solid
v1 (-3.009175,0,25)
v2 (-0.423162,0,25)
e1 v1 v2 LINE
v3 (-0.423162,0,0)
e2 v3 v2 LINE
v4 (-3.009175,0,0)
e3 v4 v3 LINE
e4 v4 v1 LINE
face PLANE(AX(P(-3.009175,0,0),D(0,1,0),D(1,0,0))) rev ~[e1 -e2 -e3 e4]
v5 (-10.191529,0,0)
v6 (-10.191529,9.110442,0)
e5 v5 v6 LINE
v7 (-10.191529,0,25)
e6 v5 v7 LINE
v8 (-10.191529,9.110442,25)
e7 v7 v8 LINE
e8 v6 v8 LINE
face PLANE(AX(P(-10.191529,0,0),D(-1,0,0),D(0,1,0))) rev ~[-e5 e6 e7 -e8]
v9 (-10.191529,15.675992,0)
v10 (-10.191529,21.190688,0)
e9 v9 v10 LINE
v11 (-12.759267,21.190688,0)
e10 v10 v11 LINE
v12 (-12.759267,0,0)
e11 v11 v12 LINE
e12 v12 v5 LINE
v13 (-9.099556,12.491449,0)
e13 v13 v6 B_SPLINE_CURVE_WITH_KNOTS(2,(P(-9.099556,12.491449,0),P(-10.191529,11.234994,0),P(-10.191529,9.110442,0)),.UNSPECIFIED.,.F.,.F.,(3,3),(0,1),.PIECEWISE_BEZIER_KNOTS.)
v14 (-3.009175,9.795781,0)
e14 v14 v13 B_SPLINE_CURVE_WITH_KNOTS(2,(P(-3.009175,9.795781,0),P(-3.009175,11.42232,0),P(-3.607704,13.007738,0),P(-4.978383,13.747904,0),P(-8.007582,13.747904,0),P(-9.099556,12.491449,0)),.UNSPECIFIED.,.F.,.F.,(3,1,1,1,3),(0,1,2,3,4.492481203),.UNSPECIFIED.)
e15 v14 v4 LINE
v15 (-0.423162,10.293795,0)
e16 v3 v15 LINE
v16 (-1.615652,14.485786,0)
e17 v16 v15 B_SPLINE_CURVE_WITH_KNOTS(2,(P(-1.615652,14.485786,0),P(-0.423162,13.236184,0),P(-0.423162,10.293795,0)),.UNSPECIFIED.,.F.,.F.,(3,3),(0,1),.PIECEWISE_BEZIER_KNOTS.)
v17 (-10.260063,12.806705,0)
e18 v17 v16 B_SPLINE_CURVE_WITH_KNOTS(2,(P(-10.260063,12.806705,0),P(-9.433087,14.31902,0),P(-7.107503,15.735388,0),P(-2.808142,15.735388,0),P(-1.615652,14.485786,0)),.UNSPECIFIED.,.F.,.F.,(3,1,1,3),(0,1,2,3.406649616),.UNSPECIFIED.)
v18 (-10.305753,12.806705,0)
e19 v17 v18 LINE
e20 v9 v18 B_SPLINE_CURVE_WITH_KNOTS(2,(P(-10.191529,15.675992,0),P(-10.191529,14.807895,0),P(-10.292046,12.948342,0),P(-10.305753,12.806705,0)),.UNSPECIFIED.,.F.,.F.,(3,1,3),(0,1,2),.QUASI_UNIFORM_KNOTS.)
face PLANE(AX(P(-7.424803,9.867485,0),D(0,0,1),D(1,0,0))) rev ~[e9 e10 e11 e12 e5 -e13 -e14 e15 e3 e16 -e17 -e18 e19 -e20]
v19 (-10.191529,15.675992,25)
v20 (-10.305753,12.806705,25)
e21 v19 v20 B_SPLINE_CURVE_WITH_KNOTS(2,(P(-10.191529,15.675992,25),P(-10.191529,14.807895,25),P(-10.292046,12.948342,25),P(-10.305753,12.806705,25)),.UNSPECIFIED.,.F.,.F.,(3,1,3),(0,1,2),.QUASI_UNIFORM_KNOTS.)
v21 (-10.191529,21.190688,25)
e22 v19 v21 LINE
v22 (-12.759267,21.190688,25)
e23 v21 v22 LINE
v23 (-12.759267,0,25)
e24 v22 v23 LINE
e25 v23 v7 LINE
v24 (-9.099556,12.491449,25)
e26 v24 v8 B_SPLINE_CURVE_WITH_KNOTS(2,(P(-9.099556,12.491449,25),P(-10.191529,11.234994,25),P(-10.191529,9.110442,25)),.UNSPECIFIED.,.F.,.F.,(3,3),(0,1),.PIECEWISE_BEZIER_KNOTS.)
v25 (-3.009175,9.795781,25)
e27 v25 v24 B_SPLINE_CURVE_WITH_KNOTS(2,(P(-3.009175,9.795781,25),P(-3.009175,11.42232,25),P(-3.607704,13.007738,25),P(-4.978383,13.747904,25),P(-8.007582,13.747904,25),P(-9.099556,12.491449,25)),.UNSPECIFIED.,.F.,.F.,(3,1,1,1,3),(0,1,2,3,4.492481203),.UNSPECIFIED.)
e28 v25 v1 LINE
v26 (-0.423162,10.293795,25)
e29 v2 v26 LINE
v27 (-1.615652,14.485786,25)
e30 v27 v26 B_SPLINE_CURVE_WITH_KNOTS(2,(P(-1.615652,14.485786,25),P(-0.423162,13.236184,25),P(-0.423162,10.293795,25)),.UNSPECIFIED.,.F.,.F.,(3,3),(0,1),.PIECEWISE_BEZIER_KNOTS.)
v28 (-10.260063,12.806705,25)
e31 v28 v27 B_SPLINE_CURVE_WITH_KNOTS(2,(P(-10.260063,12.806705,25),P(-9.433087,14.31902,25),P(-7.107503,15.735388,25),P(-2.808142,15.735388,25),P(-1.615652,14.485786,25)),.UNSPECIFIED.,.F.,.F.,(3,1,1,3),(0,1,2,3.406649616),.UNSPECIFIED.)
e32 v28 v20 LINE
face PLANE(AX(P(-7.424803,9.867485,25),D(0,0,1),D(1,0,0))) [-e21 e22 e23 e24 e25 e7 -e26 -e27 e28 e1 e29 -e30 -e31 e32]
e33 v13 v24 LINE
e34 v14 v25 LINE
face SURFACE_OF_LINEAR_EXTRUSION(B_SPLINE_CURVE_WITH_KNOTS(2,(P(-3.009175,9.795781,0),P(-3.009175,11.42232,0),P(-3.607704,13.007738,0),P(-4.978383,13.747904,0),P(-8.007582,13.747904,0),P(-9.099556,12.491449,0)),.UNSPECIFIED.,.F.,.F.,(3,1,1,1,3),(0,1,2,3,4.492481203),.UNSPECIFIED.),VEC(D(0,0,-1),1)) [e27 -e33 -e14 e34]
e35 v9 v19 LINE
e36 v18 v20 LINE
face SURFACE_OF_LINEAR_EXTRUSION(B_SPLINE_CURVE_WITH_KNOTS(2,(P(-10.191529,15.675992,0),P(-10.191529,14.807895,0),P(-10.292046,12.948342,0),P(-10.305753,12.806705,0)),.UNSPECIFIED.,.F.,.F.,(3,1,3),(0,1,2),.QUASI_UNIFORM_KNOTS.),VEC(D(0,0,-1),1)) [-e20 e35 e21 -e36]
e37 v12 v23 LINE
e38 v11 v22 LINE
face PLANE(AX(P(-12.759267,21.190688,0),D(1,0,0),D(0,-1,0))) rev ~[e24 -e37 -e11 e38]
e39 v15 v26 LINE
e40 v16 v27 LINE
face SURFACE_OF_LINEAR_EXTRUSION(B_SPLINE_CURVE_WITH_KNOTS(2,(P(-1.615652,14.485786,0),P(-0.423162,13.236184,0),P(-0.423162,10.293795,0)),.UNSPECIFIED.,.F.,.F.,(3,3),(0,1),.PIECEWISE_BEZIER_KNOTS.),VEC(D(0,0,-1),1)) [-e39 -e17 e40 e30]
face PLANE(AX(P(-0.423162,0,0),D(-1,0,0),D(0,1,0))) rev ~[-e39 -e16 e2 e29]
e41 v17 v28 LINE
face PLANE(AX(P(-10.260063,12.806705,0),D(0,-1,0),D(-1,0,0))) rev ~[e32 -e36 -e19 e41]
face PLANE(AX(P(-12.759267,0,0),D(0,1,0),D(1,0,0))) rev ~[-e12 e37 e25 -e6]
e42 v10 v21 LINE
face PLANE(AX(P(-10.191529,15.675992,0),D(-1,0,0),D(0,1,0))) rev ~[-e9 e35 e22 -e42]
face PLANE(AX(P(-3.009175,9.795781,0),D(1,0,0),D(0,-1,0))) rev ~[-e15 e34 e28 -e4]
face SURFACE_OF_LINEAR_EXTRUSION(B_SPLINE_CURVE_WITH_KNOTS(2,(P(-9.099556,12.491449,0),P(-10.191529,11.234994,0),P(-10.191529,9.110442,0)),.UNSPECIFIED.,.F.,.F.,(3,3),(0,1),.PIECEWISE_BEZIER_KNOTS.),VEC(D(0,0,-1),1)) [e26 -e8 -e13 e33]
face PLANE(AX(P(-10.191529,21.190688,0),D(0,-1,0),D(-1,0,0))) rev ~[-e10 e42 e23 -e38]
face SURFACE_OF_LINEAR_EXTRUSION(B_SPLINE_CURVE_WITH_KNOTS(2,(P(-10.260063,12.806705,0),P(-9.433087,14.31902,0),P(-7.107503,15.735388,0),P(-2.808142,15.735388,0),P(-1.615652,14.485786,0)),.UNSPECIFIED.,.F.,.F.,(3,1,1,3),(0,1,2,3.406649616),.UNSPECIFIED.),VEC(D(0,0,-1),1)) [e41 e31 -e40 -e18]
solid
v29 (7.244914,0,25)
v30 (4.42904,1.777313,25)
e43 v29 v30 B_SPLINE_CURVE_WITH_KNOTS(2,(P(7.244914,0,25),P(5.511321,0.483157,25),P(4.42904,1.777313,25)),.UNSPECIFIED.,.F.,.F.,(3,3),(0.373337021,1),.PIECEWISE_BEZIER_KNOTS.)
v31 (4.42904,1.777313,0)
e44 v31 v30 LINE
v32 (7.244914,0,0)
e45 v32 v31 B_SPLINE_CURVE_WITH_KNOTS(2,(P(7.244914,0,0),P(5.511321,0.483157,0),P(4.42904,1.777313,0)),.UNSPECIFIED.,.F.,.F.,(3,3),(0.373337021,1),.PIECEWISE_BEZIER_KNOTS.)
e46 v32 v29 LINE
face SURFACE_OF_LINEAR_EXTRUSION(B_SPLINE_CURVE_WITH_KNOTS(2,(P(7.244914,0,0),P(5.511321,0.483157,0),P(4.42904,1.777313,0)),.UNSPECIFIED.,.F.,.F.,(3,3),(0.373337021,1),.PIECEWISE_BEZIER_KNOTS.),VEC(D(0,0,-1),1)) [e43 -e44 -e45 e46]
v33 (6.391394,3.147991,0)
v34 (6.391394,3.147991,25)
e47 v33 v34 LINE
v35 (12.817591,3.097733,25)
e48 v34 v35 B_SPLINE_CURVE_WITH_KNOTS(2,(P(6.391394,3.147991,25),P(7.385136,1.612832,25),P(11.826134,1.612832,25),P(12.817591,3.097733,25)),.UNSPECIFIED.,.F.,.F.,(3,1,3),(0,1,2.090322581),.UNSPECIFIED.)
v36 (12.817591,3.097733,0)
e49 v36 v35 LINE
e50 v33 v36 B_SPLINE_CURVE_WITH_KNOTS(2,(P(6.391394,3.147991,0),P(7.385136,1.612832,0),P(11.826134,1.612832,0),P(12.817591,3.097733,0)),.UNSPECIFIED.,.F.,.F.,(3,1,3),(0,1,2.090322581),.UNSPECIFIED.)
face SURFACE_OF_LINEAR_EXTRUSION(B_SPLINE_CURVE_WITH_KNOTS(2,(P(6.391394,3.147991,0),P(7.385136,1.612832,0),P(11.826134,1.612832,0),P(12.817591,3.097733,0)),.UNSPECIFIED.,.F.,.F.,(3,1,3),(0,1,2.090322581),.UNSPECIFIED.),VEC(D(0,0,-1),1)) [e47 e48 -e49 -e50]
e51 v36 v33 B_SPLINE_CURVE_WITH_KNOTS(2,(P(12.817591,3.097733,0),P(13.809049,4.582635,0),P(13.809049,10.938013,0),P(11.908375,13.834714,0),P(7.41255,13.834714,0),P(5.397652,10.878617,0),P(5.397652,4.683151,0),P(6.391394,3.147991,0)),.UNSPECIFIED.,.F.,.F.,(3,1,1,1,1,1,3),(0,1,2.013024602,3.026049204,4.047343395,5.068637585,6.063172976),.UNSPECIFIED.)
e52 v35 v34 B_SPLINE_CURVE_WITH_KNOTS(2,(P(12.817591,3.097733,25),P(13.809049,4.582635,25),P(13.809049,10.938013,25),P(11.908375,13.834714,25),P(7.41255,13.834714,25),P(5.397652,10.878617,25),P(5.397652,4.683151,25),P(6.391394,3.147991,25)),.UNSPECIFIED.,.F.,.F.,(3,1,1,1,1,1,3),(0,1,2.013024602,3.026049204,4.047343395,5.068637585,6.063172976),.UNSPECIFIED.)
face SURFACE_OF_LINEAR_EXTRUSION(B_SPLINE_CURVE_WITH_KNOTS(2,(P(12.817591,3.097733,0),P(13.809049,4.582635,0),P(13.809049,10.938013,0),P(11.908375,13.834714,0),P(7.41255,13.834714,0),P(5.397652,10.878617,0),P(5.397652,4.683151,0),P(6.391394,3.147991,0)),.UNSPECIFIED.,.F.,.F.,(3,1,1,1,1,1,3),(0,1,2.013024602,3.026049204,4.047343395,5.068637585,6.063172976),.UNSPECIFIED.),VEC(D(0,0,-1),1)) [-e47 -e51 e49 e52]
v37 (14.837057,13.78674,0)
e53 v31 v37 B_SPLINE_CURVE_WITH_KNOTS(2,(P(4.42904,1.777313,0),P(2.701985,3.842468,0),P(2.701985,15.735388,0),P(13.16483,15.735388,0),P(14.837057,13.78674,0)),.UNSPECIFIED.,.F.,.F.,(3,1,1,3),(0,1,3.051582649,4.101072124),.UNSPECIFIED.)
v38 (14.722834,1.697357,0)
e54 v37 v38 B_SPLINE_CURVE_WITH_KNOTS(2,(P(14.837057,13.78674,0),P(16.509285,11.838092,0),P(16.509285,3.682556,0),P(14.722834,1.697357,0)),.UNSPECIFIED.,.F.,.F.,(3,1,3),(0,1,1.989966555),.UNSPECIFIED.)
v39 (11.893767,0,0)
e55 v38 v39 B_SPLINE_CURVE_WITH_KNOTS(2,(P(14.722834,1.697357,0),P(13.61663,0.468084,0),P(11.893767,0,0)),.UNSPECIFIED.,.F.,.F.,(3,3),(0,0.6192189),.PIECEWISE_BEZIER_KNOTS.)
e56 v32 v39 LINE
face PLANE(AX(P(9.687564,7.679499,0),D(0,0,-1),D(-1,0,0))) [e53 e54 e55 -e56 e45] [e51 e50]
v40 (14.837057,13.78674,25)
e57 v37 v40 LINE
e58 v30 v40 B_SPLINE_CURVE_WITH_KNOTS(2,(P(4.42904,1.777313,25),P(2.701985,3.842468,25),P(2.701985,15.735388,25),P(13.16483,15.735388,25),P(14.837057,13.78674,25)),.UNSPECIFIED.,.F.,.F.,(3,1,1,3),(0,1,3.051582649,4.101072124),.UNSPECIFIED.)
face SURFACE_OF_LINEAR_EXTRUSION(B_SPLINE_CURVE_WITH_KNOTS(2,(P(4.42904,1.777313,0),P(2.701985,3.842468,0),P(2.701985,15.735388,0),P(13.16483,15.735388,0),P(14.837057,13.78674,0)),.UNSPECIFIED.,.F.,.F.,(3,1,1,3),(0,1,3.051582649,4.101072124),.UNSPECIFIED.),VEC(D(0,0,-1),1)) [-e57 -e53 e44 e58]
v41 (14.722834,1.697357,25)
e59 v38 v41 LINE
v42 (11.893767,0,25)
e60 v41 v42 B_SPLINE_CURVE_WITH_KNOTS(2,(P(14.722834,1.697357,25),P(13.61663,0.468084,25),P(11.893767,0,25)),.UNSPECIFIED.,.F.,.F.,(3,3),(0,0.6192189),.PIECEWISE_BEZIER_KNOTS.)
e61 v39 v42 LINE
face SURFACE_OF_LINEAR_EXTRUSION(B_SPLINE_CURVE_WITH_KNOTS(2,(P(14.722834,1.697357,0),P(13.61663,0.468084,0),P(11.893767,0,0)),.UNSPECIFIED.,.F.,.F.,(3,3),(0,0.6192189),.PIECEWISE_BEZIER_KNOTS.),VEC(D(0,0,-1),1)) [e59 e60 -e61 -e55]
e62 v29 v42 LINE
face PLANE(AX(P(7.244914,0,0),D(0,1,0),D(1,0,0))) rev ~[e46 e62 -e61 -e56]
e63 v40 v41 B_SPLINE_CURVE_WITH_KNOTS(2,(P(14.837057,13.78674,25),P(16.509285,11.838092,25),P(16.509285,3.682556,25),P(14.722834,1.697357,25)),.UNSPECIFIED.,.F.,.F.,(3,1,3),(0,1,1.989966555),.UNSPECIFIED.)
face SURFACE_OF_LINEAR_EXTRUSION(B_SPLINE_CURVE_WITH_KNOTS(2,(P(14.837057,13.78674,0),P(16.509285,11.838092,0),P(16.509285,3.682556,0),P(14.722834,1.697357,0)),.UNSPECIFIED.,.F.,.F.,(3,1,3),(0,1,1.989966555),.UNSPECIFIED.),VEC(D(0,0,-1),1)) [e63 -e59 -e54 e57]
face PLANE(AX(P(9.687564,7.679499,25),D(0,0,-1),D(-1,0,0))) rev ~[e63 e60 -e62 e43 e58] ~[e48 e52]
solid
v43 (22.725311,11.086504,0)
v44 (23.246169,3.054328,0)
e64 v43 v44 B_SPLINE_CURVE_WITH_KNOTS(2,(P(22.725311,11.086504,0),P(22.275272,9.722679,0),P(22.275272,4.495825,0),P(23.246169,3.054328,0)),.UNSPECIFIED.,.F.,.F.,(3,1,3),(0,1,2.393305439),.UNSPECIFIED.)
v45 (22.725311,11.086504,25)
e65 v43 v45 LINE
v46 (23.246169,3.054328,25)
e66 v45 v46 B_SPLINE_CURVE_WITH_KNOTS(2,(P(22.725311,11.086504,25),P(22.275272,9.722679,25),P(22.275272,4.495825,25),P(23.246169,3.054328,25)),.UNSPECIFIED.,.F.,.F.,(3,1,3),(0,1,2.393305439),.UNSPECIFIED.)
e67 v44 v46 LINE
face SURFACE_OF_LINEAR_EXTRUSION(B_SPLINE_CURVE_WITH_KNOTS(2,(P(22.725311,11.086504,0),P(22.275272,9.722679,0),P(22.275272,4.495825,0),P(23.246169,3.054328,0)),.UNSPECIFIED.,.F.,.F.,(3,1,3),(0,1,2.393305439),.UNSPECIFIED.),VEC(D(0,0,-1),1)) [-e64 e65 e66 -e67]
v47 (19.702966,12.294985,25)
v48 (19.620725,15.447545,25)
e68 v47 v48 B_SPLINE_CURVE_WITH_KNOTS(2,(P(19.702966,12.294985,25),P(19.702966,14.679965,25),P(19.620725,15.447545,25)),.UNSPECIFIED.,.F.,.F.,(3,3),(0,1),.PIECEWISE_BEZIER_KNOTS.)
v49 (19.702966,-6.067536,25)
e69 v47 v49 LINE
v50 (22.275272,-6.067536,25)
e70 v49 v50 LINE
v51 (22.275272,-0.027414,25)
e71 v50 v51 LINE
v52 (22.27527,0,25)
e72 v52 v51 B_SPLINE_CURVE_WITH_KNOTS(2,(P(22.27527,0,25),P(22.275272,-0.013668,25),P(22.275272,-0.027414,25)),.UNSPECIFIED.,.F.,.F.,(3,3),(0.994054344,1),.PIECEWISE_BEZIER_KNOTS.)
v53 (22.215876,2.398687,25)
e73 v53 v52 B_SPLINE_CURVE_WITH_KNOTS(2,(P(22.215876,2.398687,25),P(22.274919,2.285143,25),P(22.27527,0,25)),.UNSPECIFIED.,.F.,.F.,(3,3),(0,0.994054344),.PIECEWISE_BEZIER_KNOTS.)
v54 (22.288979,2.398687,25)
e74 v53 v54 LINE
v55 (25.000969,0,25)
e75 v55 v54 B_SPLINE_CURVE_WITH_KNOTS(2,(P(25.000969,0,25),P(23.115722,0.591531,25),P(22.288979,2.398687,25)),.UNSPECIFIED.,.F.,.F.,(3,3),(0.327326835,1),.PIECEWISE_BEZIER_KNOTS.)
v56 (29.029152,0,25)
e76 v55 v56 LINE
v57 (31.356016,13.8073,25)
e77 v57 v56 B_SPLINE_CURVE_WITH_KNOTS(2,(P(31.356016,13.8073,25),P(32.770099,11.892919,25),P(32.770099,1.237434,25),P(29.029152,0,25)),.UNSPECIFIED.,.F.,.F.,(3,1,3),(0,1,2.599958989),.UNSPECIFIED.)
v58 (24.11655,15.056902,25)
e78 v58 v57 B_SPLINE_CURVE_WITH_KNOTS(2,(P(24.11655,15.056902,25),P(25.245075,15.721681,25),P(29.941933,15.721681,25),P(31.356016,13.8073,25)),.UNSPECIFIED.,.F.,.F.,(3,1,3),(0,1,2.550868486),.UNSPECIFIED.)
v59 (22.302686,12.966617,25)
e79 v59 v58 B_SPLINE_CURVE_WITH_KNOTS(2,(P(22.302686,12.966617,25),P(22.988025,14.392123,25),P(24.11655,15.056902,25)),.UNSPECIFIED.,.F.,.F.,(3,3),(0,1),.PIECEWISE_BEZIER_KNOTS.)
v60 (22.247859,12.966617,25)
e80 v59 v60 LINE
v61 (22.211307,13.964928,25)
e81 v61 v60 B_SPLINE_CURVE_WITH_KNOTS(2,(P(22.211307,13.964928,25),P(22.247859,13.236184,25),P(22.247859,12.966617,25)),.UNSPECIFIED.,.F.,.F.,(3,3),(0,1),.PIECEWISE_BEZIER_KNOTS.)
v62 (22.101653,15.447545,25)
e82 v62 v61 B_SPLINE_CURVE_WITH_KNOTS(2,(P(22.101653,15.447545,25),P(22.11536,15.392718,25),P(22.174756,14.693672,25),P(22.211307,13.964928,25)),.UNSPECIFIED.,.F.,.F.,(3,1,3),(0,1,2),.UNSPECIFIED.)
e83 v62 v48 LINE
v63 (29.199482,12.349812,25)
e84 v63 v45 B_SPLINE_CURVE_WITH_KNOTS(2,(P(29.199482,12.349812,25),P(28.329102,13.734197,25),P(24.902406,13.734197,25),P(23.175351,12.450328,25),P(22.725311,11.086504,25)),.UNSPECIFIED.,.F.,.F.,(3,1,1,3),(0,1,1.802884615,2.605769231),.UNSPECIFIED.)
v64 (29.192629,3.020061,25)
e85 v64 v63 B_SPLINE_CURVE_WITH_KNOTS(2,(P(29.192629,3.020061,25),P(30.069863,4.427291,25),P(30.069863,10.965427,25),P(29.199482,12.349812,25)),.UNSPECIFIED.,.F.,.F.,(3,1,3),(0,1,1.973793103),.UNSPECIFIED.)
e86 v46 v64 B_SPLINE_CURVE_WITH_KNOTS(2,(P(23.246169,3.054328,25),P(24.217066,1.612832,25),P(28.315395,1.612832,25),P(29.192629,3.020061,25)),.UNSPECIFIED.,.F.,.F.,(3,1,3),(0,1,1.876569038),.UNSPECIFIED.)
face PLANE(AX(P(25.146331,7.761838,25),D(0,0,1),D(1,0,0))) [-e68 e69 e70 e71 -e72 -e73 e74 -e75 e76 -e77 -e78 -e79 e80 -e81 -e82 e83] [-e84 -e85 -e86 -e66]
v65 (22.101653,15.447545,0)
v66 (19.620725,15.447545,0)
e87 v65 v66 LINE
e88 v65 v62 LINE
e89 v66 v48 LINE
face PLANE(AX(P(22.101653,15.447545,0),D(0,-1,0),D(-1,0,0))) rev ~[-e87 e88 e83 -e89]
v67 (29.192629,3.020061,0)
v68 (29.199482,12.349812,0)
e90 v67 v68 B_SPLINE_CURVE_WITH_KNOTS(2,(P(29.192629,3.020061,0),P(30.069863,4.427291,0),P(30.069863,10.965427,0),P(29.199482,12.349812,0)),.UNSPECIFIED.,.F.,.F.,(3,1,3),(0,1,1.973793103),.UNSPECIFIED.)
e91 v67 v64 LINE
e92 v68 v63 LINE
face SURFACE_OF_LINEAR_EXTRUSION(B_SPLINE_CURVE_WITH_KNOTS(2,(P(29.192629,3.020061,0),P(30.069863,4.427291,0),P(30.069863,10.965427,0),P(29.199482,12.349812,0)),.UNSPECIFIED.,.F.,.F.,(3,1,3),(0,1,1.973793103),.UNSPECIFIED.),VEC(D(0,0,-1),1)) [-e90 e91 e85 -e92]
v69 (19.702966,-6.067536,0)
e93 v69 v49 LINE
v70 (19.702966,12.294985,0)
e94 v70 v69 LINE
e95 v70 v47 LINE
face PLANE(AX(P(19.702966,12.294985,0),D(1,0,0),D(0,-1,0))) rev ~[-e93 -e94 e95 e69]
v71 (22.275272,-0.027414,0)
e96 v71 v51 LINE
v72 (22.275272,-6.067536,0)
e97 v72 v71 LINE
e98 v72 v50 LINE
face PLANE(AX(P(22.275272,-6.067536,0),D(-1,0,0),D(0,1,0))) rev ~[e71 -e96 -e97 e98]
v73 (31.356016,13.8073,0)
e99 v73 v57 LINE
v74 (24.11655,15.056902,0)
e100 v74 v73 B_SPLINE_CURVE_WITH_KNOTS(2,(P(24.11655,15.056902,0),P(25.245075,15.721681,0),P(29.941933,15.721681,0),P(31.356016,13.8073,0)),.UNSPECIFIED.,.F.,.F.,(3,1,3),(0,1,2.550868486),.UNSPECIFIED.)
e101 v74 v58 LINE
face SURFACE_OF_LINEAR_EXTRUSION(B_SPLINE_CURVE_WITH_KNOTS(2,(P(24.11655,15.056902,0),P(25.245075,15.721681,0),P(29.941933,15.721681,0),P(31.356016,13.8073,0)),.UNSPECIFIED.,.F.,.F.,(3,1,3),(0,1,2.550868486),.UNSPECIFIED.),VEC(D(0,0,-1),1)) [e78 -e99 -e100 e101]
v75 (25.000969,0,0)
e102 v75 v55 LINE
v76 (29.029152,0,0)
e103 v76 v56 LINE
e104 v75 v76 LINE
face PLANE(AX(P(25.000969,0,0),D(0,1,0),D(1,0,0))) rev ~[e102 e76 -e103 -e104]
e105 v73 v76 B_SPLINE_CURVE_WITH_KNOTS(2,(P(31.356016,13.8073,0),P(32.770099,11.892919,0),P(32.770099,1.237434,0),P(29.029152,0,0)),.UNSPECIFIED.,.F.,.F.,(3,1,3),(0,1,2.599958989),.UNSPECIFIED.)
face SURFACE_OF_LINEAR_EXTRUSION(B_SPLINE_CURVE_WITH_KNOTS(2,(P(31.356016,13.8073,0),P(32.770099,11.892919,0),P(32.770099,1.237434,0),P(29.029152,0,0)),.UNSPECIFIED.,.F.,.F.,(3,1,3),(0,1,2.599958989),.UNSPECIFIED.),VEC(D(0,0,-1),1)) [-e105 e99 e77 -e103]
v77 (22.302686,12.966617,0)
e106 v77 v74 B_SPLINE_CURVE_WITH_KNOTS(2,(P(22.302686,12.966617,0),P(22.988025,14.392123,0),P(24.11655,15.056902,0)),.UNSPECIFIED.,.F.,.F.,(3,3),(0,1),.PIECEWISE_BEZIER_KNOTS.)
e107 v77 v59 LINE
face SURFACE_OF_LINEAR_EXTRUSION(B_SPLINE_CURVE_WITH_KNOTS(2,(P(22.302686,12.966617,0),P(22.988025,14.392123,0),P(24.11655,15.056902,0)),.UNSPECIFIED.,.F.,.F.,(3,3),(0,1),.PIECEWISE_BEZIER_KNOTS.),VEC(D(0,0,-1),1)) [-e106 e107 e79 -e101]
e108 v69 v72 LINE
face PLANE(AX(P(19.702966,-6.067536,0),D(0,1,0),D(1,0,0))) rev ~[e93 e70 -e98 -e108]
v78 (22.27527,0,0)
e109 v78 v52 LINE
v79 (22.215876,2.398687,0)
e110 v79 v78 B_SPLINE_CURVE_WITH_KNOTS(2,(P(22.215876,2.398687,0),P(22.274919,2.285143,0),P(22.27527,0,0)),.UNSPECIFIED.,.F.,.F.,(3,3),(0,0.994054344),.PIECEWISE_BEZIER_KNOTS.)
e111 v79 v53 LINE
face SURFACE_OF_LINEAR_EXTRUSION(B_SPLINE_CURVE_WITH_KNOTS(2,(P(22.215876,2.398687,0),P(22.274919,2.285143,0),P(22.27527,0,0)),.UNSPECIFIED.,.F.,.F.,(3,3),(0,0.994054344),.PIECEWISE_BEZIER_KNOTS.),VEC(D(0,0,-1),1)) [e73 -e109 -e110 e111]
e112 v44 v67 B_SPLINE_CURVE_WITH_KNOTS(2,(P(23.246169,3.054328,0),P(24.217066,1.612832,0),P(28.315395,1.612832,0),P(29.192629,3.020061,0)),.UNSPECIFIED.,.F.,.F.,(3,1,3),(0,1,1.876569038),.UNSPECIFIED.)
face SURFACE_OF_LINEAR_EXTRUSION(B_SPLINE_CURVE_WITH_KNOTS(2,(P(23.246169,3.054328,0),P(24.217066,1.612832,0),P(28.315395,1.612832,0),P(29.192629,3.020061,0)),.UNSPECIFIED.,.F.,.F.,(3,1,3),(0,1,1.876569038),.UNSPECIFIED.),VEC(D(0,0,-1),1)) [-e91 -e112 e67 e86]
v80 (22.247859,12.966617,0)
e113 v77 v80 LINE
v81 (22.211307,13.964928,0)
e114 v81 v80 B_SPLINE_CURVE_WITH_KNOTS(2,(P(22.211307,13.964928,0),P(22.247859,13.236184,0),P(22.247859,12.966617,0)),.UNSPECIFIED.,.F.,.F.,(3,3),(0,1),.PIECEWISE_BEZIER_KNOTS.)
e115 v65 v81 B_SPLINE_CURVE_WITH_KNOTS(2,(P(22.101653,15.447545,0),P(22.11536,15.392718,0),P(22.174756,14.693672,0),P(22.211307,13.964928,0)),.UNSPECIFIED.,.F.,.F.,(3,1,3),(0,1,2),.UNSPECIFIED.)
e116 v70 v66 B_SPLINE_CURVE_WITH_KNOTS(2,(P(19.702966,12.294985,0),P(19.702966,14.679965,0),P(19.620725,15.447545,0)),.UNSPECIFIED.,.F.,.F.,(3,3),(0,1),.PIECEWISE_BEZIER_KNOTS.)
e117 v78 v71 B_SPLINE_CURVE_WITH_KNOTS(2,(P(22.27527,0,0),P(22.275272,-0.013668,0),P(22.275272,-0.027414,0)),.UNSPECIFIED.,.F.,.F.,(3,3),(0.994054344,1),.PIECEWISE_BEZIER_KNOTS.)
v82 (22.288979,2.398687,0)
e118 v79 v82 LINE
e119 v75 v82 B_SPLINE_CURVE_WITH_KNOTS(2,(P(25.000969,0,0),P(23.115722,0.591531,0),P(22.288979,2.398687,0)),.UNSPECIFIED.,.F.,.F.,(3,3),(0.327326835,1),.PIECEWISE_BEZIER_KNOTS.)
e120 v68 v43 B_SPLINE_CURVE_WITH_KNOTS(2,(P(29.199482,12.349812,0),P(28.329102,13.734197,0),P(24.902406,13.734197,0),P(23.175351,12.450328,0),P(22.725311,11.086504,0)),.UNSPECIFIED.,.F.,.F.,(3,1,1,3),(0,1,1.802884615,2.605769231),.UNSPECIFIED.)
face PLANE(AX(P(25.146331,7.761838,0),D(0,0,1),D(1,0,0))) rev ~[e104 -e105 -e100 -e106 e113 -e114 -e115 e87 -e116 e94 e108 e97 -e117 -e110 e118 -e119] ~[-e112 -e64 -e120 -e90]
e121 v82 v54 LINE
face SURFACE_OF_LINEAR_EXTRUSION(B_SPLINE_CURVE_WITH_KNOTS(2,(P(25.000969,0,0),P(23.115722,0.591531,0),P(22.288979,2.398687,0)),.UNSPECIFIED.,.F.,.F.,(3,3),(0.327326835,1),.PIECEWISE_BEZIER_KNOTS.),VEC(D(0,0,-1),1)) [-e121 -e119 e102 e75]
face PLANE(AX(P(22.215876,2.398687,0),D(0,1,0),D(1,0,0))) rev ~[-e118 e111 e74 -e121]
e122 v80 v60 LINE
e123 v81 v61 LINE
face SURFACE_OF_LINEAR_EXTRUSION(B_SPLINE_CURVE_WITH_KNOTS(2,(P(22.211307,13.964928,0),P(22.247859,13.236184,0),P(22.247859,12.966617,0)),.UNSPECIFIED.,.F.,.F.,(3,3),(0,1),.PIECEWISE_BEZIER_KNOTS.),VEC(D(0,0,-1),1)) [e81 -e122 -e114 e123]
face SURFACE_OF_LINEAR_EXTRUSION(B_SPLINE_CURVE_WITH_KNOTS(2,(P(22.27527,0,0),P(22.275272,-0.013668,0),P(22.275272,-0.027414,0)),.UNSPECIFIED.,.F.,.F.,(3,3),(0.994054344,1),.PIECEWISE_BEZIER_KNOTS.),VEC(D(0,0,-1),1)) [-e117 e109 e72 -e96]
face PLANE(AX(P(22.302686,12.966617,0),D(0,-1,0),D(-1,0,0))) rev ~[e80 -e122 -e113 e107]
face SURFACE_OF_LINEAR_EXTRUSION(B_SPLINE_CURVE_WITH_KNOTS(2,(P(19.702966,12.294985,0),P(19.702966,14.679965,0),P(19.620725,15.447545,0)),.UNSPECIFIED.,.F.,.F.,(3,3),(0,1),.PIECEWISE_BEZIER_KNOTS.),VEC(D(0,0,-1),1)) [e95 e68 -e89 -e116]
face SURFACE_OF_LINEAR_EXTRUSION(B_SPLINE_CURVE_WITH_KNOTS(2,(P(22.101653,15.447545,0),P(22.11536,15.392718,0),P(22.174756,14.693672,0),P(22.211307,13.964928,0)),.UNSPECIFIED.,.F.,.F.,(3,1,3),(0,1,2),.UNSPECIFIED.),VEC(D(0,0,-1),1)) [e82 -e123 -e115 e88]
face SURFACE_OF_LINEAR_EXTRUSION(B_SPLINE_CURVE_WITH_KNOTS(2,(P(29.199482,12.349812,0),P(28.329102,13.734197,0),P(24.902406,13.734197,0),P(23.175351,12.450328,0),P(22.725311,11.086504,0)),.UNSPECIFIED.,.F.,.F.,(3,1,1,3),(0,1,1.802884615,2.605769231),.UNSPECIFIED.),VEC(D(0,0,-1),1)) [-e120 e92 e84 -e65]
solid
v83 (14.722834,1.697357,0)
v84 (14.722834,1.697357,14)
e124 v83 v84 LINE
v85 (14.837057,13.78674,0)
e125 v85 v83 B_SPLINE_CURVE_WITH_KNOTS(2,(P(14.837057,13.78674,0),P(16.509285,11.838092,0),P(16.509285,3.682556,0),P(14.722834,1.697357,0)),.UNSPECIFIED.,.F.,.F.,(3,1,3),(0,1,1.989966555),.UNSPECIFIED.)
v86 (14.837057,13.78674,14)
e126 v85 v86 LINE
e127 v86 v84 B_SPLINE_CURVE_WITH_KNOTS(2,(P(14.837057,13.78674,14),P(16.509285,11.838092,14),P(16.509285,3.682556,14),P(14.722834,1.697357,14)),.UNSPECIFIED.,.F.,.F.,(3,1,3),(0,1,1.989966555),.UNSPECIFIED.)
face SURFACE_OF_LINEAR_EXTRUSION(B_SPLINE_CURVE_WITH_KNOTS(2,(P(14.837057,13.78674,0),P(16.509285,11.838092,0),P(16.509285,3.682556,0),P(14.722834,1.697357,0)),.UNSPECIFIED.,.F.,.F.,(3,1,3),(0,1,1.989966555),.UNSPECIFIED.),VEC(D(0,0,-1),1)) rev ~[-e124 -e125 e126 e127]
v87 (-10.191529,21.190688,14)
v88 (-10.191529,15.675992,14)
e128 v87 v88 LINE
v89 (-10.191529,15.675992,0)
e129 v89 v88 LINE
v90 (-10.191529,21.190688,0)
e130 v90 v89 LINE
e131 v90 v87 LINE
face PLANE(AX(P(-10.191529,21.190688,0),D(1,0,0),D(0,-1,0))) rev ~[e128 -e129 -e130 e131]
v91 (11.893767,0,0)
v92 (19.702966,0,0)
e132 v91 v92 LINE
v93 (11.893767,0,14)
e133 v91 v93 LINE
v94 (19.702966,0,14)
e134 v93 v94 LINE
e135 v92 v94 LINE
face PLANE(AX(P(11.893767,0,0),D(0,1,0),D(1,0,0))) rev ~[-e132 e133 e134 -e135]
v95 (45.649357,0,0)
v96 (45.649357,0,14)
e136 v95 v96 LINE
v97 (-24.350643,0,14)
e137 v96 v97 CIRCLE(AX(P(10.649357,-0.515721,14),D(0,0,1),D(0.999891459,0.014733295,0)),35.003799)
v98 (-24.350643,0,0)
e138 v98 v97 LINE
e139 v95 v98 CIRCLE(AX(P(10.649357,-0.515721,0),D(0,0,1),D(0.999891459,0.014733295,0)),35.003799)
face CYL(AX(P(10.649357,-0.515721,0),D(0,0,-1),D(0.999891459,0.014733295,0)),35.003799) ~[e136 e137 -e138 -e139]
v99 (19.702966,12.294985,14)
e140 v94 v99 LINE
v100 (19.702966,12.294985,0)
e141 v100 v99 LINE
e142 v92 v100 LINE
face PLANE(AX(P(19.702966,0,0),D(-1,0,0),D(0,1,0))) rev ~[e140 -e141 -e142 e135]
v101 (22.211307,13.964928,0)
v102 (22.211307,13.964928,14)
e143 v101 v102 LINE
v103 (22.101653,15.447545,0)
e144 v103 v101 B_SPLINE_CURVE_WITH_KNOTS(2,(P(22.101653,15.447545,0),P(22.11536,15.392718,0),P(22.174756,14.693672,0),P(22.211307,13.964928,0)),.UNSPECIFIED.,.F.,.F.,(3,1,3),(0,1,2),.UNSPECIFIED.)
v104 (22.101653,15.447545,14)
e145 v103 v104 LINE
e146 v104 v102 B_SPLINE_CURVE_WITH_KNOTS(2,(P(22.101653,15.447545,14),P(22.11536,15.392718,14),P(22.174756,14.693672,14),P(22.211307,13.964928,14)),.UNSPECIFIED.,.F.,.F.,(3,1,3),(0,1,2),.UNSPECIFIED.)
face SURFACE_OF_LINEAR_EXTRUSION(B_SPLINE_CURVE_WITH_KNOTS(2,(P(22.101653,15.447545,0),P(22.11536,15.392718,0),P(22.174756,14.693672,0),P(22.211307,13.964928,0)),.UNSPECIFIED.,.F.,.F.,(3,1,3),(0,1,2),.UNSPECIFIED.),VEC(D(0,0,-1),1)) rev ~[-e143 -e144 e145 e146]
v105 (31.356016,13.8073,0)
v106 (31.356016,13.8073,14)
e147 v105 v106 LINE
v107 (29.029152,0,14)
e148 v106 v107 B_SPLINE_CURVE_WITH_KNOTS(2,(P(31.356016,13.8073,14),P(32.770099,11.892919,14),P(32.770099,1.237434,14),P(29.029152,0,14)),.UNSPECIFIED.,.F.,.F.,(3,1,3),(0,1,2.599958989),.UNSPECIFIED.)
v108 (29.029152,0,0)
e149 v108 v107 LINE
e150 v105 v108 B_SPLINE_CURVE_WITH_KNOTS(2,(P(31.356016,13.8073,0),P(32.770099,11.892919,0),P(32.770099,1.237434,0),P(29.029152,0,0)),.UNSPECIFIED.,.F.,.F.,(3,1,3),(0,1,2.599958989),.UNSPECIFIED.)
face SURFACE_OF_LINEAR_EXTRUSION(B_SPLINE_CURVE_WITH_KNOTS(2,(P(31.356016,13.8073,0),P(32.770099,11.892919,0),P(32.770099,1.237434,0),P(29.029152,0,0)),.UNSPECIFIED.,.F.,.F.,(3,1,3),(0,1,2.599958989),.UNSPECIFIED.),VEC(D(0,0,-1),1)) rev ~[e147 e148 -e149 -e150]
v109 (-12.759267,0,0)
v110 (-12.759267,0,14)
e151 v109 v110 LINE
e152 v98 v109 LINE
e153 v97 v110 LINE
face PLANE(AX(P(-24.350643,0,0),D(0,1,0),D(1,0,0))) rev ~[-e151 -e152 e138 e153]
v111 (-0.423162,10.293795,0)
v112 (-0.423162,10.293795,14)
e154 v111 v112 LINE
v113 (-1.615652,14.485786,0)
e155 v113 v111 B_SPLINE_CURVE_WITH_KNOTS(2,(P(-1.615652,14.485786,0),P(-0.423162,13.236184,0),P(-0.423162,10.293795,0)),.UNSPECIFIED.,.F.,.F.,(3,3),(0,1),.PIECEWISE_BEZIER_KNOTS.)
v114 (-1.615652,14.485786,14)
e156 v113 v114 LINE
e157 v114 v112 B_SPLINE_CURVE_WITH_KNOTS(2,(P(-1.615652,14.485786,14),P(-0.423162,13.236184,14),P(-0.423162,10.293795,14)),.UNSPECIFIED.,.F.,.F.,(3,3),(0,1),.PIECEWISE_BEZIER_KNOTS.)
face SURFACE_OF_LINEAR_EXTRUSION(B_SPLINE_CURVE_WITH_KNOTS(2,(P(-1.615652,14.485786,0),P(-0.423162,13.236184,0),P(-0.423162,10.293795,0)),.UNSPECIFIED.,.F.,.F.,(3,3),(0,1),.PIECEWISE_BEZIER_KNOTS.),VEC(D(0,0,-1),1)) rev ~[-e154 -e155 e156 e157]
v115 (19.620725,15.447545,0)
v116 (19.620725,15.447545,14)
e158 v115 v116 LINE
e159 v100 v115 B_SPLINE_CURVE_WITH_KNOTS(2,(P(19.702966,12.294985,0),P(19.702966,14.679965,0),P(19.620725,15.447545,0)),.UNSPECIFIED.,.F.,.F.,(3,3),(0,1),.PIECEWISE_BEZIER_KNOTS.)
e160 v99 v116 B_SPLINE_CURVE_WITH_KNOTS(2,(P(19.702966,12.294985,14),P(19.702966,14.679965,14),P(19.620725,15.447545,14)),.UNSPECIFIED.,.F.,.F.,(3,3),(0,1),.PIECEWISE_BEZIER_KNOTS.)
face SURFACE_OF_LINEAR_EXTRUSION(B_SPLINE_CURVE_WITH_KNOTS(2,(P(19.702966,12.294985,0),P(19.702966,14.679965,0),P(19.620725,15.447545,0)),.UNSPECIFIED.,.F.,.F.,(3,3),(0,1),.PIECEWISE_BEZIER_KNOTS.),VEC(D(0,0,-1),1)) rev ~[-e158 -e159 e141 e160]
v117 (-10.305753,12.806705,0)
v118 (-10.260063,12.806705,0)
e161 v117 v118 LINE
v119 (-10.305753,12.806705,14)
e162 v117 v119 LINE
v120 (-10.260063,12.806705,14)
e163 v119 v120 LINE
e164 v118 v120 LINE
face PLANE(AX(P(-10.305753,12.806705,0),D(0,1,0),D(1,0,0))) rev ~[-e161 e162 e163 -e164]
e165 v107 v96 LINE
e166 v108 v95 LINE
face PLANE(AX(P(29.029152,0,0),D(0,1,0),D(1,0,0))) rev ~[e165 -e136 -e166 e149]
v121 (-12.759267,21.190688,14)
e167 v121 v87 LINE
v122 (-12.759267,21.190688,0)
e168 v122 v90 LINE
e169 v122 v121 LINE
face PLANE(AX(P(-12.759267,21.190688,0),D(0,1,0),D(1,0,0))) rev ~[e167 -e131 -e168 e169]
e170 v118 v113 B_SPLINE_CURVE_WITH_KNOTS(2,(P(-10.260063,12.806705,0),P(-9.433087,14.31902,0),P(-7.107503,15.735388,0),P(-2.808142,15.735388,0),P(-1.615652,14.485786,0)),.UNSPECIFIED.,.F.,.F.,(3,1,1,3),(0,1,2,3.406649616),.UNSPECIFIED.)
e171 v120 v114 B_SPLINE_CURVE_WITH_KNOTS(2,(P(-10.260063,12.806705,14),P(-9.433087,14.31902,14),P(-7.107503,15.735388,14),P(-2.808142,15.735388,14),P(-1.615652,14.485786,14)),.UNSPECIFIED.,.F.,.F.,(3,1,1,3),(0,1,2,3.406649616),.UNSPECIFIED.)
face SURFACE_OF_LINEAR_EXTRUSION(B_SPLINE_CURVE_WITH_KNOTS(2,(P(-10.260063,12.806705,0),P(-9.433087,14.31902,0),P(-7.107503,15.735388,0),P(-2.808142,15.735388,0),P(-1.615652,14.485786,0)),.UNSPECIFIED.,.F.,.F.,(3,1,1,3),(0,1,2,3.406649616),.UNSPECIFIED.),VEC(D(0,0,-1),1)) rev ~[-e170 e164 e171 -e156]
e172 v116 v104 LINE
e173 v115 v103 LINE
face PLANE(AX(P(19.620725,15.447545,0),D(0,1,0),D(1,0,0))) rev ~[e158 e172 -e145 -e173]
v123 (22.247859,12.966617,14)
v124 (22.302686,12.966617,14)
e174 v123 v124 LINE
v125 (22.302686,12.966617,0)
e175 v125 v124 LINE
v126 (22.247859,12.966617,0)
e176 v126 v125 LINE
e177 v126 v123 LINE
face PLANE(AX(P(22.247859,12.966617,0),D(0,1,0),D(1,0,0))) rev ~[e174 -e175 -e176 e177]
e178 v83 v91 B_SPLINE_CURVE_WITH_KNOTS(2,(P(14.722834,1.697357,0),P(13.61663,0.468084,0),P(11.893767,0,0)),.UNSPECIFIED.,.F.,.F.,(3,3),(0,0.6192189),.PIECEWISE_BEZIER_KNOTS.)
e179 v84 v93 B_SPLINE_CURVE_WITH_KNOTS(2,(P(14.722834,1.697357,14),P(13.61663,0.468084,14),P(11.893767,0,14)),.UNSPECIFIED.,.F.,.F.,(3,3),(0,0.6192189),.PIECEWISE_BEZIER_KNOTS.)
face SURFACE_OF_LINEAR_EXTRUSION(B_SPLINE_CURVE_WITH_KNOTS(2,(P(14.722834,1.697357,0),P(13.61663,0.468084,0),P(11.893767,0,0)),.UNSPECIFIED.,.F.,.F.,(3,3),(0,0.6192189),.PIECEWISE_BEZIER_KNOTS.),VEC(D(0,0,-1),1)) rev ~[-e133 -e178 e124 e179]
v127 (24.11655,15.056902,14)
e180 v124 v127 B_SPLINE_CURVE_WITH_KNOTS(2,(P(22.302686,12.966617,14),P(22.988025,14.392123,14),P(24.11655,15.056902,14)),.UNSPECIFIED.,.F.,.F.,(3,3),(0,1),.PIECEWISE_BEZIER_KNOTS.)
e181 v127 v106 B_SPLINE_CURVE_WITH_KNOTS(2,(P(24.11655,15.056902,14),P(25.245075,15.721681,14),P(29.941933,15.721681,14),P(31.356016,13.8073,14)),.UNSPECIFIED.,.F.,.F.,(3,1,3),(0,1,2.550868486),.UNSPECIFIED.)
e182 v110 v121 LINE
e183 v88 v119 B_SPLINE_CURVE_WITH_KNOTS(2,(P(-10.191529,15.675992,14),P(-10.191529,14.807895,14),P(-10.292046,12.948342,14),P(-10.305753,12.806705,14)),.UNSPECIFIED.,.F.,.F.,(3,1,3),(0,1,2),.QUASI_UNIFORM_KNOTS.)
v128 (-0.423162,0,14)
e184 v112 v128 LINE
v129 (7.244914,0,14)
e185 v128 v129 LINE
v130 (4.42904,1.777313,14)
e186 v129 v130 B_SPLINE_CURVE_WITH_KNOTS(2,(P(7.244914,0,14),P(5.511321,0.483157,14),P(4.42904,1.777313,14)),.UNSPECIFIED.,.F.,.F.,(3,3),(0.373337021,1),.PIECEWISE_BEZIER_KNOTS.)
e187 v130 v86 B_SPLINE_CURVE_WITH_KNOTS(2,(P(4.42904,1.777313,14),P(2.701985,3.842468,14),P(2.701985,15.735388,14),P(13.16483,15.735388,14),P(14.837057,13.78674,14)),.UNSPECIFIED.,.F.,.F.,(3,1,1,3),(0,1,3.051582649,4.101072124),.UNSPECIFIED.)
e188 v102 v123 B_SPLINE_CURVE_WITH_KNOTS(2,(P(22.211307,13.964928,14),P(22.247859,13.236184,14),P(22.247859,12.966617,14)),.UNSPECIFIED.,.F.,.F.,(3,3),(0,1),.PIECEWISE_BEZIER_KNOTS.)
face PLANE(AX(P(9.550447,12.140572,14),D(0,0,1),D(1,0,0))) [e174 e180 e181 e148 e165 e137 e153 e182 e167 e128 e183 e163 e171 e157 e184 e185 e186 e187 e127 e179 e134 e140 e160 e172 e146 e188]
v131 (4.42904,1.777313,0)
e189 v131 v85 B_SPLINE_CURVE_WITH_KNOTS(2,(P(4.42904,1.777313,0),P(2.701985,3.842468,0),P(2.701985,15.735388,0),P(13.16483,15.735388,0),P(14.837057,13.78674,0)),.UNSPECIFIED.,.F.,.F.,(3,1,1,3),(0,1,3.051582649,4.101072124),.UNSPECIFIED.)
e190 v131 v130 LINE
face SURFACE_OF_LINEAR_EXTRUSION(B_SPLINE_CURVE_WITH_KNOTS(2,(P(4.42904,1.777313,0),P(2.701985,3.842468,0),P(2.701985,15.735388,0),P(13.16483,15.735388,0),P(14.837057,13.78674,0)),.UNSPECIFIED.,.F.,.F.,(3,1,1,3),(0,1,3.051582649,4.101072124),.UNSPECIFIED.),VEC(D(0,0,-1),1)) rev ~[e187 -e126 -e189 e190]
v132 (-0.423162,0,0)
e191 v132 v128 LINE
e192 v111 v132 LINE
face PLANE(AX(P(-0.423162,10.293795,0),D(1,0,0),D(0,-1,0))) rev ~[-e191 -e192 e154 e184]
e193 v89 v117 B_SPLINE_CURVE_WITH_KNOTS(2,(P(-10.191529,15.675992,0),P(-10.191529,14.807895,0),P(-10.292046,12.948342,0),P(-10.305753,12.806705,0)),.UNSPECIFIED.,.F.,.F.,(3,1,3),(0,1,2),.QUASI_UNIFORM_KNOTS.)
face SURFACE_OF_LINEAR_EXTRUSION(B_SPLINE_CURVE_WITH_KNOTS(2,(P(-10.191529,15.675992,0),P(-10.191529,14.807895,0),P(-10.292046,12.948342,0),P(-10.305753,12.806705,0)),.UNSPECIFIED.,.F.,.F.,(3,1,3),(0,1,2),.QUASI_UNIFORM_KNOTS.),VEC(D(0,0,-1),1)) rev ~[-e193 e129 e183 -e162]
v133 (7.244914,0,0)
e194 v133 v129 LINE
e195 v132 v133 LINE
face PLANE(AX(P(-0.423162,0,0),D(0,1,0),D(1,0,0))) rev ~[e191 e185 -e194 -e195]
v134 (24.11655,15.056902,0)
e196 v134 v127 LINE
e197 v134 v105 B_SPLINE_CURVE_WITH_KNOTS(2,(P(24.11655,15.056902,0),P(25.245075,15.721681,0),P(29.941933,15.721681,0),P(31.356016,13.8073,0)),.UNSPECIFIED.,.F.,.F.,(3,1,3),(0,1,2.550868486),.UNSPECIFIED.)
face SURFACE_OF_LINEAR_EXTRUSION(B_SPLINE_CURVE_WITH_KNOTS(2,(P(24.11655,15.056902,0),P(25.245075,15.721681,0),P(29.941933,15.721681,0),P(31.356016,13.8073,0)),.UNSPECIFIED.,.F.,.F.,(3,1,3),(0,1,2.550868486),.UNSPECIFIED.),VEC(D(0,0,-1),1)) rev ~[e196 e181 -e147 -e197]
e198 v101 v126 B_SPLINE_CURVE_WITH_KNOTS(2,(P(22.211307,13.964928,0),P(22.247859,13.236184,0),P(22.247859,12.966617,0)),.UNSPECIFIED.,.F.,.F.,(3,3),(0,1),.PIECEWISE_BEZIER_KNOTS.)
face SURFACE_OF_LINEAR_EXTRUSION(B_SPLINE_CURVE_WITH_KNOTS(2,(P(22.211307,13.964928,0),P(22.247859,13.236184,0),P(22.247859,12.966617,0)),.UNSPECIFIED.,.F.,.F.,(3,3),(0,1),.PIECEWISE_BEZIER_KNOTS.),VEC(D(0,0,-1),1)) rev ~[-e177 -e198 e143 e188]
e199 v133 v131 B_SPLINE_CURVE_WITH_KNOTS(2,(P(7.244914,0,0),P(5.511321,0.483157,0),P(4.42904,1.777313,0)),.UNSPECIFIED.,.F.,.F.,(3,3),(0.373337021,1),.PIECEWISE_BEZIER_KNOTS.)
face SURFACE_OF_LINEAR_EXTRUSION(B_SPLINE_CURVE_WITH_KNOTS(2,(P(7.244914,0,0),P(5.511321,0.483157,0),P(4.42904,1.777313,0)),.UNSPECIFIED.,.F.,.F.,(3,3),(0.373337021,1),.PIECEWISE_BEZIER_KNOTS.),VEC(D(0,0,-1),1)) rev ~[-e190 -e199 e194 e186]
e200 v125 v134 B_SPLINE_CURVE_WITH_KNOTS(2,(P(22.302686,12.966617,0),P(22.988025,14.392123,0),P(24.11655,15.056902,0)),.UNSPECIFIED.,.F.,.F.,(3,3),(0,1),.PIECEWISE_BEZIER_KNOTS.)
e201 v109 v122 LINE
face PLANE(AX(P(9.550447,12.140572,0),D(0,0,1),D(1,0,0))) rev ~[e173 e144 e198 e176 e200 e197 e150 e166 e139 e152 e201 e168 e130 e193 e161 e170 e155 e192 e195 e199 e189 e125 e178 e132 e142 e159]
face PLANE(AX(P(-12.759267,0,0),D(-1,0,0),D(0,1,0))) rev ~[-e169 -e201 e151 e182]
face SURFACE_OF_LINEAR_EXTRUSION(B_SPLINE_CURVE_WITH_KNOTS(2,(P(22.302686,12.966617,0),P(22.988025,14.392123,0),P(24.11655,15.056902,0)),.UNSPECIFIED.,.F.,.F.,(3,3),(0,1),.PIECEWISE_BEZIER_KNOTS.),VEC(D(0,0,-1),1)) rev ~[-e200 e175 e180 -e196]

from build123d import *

# Parameters (mm, degrees)
F1_DEPTH = 25
F2_DEPTH = 14


with BuildPart() as f1:
    # F0 (on Top) → F1 (new body)
    with BuildSketch(Plane.XY):
        with BuildLine():
            Line((-12.7592669128, 21.1906875193), (-12.7592669128, 0))
            Line((-12.7592669128, 0), (-10.1915294428, 0))
            Line((-10.1915294428, 0), (-10.1915294428, 9.1104421978))
            add(Edge.make_bspline(
                [(-9.0995556789, 12.4914488309), (-10.1915294428, 11.2349936632), (-10.1915294428, 9.1104421978)],
                knots=[0, 0, 0, 1, 1, 1], degree=2))
            add(Edge.make_bspline(
                [(-6.1937175456, 13.7479039986), (-8.0075819149, 13.7479039986), (-9.0995556789, 12.4914488309)],
                knots=[0, 0, 0, 1, 1, 1], degree=2))
            add(Edge.make_bspline(
                [(-4.2930435464, 13.3778208401), (-4.9783827288, 13.7479039986), (-6.1937175456, 13.7479039986)],
                knots=[0, 0, 0, 1, 1, 1], degree=2))
            add(Edge.make_bspline(
                [(-3.3084395877, 12.215028694), (-3.607704364, 13.0077376816), (-4.2930435464, 13.3778208401)],
                knots=[0, 0, 0, 1, 1, 1], degree=2))
            add(Edge.make_bspline(
                [(-3.0091748114, 9.7957813802), (-3.0091748114, 11.4223197064), (-3.3084395877, 12.215028694)],
                knots=[0, 0, 0, 1, 1, 1], degree=2))
            Line((-3.0091748114, 9.7957813802), (-3.0091748114, 0))
            Line((-3.0091748114, 0), (-0.4231616299, 0))
            Line((-0.4231616299, 0), (-0.4231616299, 10.2937945194))
            add(Edge.make_bspline(
                [(-1.6156518072, 14.4857858516), (-0.4231616299, 13.2361840758), (-0.4231616299, 10.2937945194)],
                knots=[0, 0, 0, 1, 1, 1], degree=2))
            add(Edge.make_bspline(
                [(-5.32105232, 15.7353876275), (-2.8081419846, 15.7353876275), (-1.6156518072, 14.4857858516)],
                knots=[0, 0, 0, 1, 1, 1], degree=2))
            add(Edge.make_bspline(
                [(-8.2702952682, 15.0272038057), (-7.1075031221, 15.7353876275), (-5.32105232, 15.7353876275)],
                knots=[0, 0, 0, 1, 1, 1], degree=2))
            add(Edge.make_bspline(
                [(-10.260063361, 12.8067048548), (-9.4330874143, 14.3190199839), (-8.2702952682, 15.0272038057)],
                knots=[0, 0, 0, 1, 1, 1], degree=2))
            Line((-10.260063361, 12.8067048548), (-10.3057526399, 12.8067048548))
            add(Edge.make_bspline(
                [(-10.2417876495, 13.8781184433), (-10.2920458562, 12.9483416192), (-10.3057526399, 12.8067048548)],
                knots=[0, 0, 0, 1, 1, 1], degree=2))
            add(Edge.make_bspline(
                [(-10.1915294428, 15.675991565), (-10.1915294428, 14.8078952674), (-10.2417876495, 13.8781184433)],
                knots=[0, 0, 0, 1, 1, 1], degree=2))
            Line((-10.1915294428, 15.675991565), (-10.1915294428, 21.1906875193))
            Line((-10.1915294428, 21.1906875193), (-12.7592669128, 21.1906875193))
        make_face()
        with BuildLine():
            add(Edge.make_bspline(
                [(7.2449142086, 0), (5.51132105, 0.4831565087), (4.4290397814, 1.7773129463)],
                knots=[0.3733370206, 0.3733370206, 0.3733370206, 1, 1, 1], degree=2))
            Line((7.2449142086, 0), (11.8937666757, 0))
            add(Edge.make_bspline(
                [(14.7228343008, 1.6973567084), (13.6166302005, 0.4680838655), (11.8937666757, 0)],
                knots=[0, 0, 0, 0.6192188998, 0.6192188998, 0.6192188998], degree=2))
            add(Edge.make_bspline(
                [(16.5092851029, 7.739763833), (16.5092851029, 3.6825558733), (14.7228343008, 1.6973567084)],
                knots=[0, 0, 0, 1, 1, 1], degree=2))
            add(Edge.make_bspline(
                [(14.8370574978, 13.7867398856), (16.5092851029, 11.8380921437), (16.5092851029, 7.739763833)],
                knots=[0, 0, 0, 1, 1, 1], degree=2))
            add(Edge.make_bspline(
                [(9.6239107838, 15.7353876275), (13.1648298928, 15.7353876275), (14.8370574978, 13.7867398856)],
                knots=[0, 0, 0, 1, 1, 1], degree=2))
            add(Edge.make_bspline(
                [(2.7019850418, 7.739763833), (2.7019850418, 15.7353876275), (9.6239107838, 15.7353876275)],
                knots=[0, 0, 0, 1, 1, 1], degree=2))
            add(Edge.make_bspline(
                [(4.4290397814, 1.7773129463), (2.7019850418, 3.8424683492), (2.7019850418, 7.739763833)],
                knots=[0, 0, 0, 1, 1, 1], degree=2))
        make_face()
        with BuildLine():
            add(Edge.make_bspline(
                [(13.8090487243, 7.739763833), (13.8090487243, 10.9380133508), (12.8587117247, 12.3863634896)],
                knots=[0, 0, 0, 1, 1, 1], degree=2))
            add(Edge.make_bspline(
                [(12.8175913738, 3.0977331044), (13.8090487243, 4.5826346662), (13.8090487243, 7.739763833)],
                knots=[0, 0, 0, 1, 1, 1], degree=2))
            add(Edge.make_bspline(
                [(9.5096875868, 1.6128315425), (11.8261340232, 1.6128315425), (12.8175913738, 3.0977331044)],
                knots=[0, 0, 0, 1, 1, 1], degree=2))
            add(Edge.make_bspline(
                [(6.3913943069, 3.1479913111), (7.3851361214, 1.6128315425), (9.5096875868, 1.6128315425)],
                knots=[0, 0, 0, 1, 1, 1], degree=2))
            add(Edge.make_bspline(
                [(5.3976524925, 7.739763833), (5.3976524925, 4.6831510796), (6.3913943069, 3.1479913111)],
                knots=[0, 0, 0, 1, 1, 1], degree=2))
            add(Edge.make_bspline(
                [(6.4051010906, 12.3566654584), (5.3976524925, 10.8786172884), (5.3976524925, 7.739763833)],
                knots=[0, 0, 0, 1, 1, 1], degree=2))
            add(Edge.make_bspline(
                [(9.6696000627, 13.8347136284), (7.4125496887, 13.8347136284), (6.4051010906, 12.3566654584)],
                knots=[0, 0, 0, 1, 1, 1], degree=2))
            add(Edge.make_bspline(
                [(12.8587117247, 12.3863634896), (11.9083747251, 13.8347136284), (9.6696000627, 13.8347136284)],
                knots=[0, 0, 0, 1, 1, 1], degree=2))
        make_face(mode=Mode.SUBTRACT)
        with BuildLine():
            Line((25.0009693957, 0), (29.0291520059, 0))
            add(Edge.make_bspline(
                [(32.7700994369, 7.7945909676), (32.7700994369, 1.2374337453), (29.0291520059, 0)],
                knots=[0, 0, 0, 0.8112850274, 0.8112850274, 0.8112850274], degree=2))
            add(Edge.make_bspline(
                [(31.3560162572, 13.8073000611), (32.7700994369, 11.8929192783), (32.7700994369, 7.7945909676)],
                knots=[0, 0, 0, 1, 1, 1], degree=2))
            add(Edge.make_bspline(
                [(27.086353151, 15.7216808439), (29.9419330776, 15.7216808439), (31.3560162572, 13.8073000611)],
                knots=[0, 0, 0, 1, 1, 1], degree=2))
            add(Edge.make_bspline(
                [(24.1165500273, 15.056901837), (25.2450752143, 15.7216808439), (27.086353151, 15.7216808439)],
                knots=[0, 0, 0, 1, 1, 1], degree=2))
            add(Edge.make_bspline(
                [(22.3026856579, 12.9666173307), (22.9880248403, 14.39212283), (24.1165500273, 15.056901837)],
                knots=[0, 0, 0, 1, 1, 1], degree=2))
            Line((22.3026856579, 12.9666173307), (22.2478585233, 12.9666173307))
            add(Edge.make_bspline(
                [(22.2113071003, 13.964928073), (22.2478585233, 13.2361840758), (22.2478585233, 12.9666173307)],
                knots=[0, 0, 0, 1, 1, 1], degree=2))
            add(Edge.make_bspline(
                [(22.145057646, 15.0431950533), (22.1747556772, 14.6936720703), (22.2113071003, 13.964928073)],
                knots=[0, 0, 0, 1, 1, 1], degree=2))
            add(Edge.make_bspline(
                [(22.1016528311, 15.4475451709), (22.1153596148, 15.3927180363), (22.145057646, 15.0431950533)],
                knots=[0, 0, 0, 1, 1, 1], degree=2))
            Line((22.1016528311, 15.4475451709), (19.6207249909, 15.4475451709))
            add(Edge.make_bspline(
                [(19.7029656928, 12.294984932), (19.7029656928, 14.6799652867), (19.6207249909, 15.4475451709)],
                knots=[0, 0, 0, 1, 1, 1], degree=2))
            Line((19.7029656928, 12.294984932), (19.7029656928, 0))
            Line((19.7029656928, 0), (22.2752699909, 0))
            add(Edge.make_bspline(
                [(22.2158760282, 2.3986871383), (22.2749189421, 2.2851430731), (22.2752699909, 0)],
                knots=[0, 0, 0, 0.9940543441, 0.9940543441, 0.9940543441], degree=2))
            Line((22.2158760282, 2.3986871383), (22.2889788743, 2.3986871383))
            add(Edge.make_bspline(
                [(25.0009693957, 0), (23.1157221771, 0.5915307738), (22.2889788743, 2.3986871383)],
                knots=[0.3273268354, 0.3273268354, 0.3273268354, 1, 1, 1], degree=2))
        make_face()
        with BuildLine():
            add(Edge.make_bspline(
                [(30.0698630583, 7.739763833), (30.0698630583, 10.9654269181), (29.1994822967, 12.3498120665)],
                knots=[0, 0, 0, 1, 1, 1], degree=2))
            add(Edge.make_bspline(
                [(29.1926289048, 3.0200613304), (30.0698630583, 4.4272911182), (30.0698630583, 7.739763833)],
                knots=[0, 0, 0, 1, 1, 1], degree=2))
            add(Edge.make_bspline(
                [(26.4010139686, 1.6128315425), (28.3153947514, 1.6128315425), (29.1926289048, 3.0200613304)],
                knots=[0, 0, 0, 1, 1, 1], degree=2))
            add(Edge.make_bspline(
                [(23.2461692657, 3.0543282895), (24.2170664407, 1.6128315425), (26.4010139686, 1.6128315425)],
                knots=[0, 0, 0, 1, 1, 1], degree=2))
            add(Edge.make_bspline(
                [(22.2752720906, 7.5387310062), (22.2752720906, 4.4958250364), (23.2461692657, 3.0543282895)],
                knots=[0, 0, 0, 1, 1, 1], degree=2))
            add(Edge.make_bspline(
                [(22.7253114871, 11.086503507), (22.2752720906, 9.7226785341), (22.2752720906, 7.5387310062)],
                knots=[0, 0, 0, 1, 1, 1], degree=2))
            add(Edge.make_bspline(
                [(24.0388782533, 13.0922628475), (23.1753508835, 12.45032848), (22.7253114871, 11.086503507)],
                knots=[0, 0, 0, 1, 1, 1], degree=2))
            add(Edge.make_bspline(
                [(26.4284275359, 13.734197215), (24.9024056231, 13.734197215), (24.0388782533, 13.0922628475)],
                knots=[0, 0, 0, 1, 1, 1], degree=2))
            add(Edge.make_bspline(
                [(29.1994822967, 12.3498120665), (28.329101535, 13.734197215), (26.4284275359, 13.734197215)],
                knots=[0, 0, 0, 1, 1, 1], degree=2))
        make_face(mode=Mode.SUBTRACT)
        with BuildLine():
            add(Edge.make_bspline(
                [(22.2752699909, 0), (22.2752720906, -0.0136679392), (22.2752720906, -0.0274135673)],
                knots=[0.9940543441, 0.9940543441, 0.9940543441, 1, 1, 1], degree=2))
            Line((22.2752699909, 0), (19.7029656928, 0))
            Line((19.7029656928, 0), (19.7029656928, -6.067536228))
            Line((19.7029656928, -6.067536228), (22.2752720906, -6.067536228))
            Line((22.2752720906, -6.067536228), (22.2752720906, -0.0274135673))
        make_face()
    extrude(amount=F1_DEPTH)


with BuildPart() as f2:
    # F0 (on Top) → F2 (new body)
    with BuildSketch(Plane.XY):
        with BuildLine():
            ThreePointArc((45.649356842, 0), (10.649356842, 34.4880780529), (-24.350643158, 0))
            Line((-24.350643158, 0), (-12.7592669128, 0))
            Line((-12.7592669128, 0), (-12.7592669128, 21.1906875193))
            Line((-12.7592669128, 21.1906875193), (-10.1915294428, 21.1906875193))
            Line((-10.1915294428, 21.1906875193), (-10.1915294428, 15.675991565))
            add(Edge.make_bspline(
                [(-10.1915294428, 15.675991565), (-10.1915294428, 14.8078952674), (-10.2417876495, 13.8781184433)],
                knots=[0, 0, 0, 1, 1, 1], degree=2))
            add(Edge.make_bspline(
                [(-10.2417876495, 13.8781184433), (-10.2920458562, 12.9483416192), (-10.3057526399, 12.8067048548)],
                knots=[0, 0, 0, 1, 1, 1], degree=2))
            Line((-10.3057526399, 12.8067048548), (-10.260063361, 12.8067048548))
            add(Edge.make_bspline(
                [(-10.260063361, 12.8067048548), (-9.4330874143, 14.3190199839), (-8.2702952682, 15.0272038057)],
                knots=[0, 0, 0, 1, 1, 1], degree=2))
            add(Edge.make_bspline(
                [(-8.2702952682, 15.0272038057), (-7.1075031221, 15.7353876275), (-5.32105232, 15.7353876275)],
                knots=[0, 0, 0, 1, 1, 1], degree=2))
            add(Edge.make_bspline(
                [(-5.32105232, 15.7353876275), (-2.8081419846, 15.7353876275), (-1.6156518072, 14.4857858516)],
                knots=[0, 0, 0, 1, 1, 1], degree=2))
            add(Edge.make_bspline(
                [(-1.6156518072, 14.4857858516), (-0.4231616299, 13.2361840758), (-0.4231616299, 10.2937945194)],
                knots=[0, 0, 0, 1, 1, 1], degree=2))
            Line((-0.4231616299, 10.2937945194), (-0.4231616299, 0))
            Line((-0.4231616299, 0), (7.2449142086, 0))
            add(Edge.make_bspline(
                [(7.2449142086, 0), (5.51132105, 0.4831565087), (4.4290397814, 1.7773129463)],
                knots=[0.3733370206, 0.3733370206, 0.3733370206, 1, 1, 1], degree=2))
            add(Edge.make_bspline(
                [(4.4290397814, 1.7773129463), (2.7019850418, 3.8424683492), (2.7019850418, 7.739763833)],
                knots=[0, 0, 0, 1, 1, 1], degree=2))
            add(Edge.make_bspline(
                [(2.7019850418, 7.739763833), (2.7019850418, 15.7353876275), (9.6239107838, 15.7353876275)],
                knots=[0, 0, 0, 1, 1, 1], degree=2))
            add(Edge.make_bspline(
                [(9.6239107838, 15.7353876275), (13.1648298928, 15.7353876275), (14.8370574978, 13.7867398856)],
                knots=[0, 0, 0, 1, 1, 1], degree=2))
            add(Edge.make_bspline(
                [(14.8370574978, 13.7867398856), (16.5092851029, 11.8380921437), (16.5092851029, 7.739763833)],
                knots=[0, 0, 0, 1, 1, 1], degree=2))
            add(Edge.make_bspline(
                [(16.5092851029, 7.739763833), (16.5092851029, 3.6825558733), (14.7228343008, 1.6973567084)],
                knots=[0, 0, 0, 1, 1, 1], degree=2))
            add(Edge.make_bspline(
                [(14.7228343008, 1.6973567084), (13.6166302005, 0.4680838655), (11.8937666757, 0)],
                knots=[0, 0, 0, 0.6192188998, 0.6192188998, 0.6192188998], degree=2))
            Line((11.8937666757, 0), (19.7029656928, 0))
            Line((19.7029656928, 0), (19.7029656928, 12.294984932))
            add(Edge.make_bspline(
                [(19.7029656928, 12.294984932), (19.7029656928, 14.6799652867), (19.6207249909, 15.4475451709)],
                knots=[0, 0, 0, 1, 1, 1], degree=2))
            Line((19.6207249909, 15.4475451709), (22.1016528311, 15.4475451709))
            add(Edge.make_bspline(
                [(22.1016528311, 15.4475451709), (22.1153596148, 15.3927180363), (22.145057646, 15.0431950533)],
                knots=[0, 0, 0, 1, 1, 1], degree=2))
            add(Edge.make_bspline(
                [(22.145057646, 15.0431950533), (22.1747556772, 14.6936720703), (22.2113071003, 13.964928073)],
                knots=[0, 0, 0, 1, 1, 1], degree=2))
            add(Edge.make_bspline(
                [(22.2113071003, 13.964928073), (22.2478585233, 13.2361840758), (22.2478585233, 12.9666173307)],
                knots=[0, 0, 0, 1, 1, 1], degree=2))
            Line((22.2478585233, 12.9666173307), (22.3026856579, 12.9666173307))
            add(Edge.make_bspline(
                [(22.3026856579, 12.9666173307), (22.9880248403, 14.39212283), (24.1165500273, 15.056901837)],
                knots=[0, 0, 0, 1, 1, 1], degree=2))
            add(Edge.make_bspline(
                [(24.1165500273, 15.056901837), (25.2450752143, 15.7216808439), (27.086353151, 15.7216808439)],
                knots=[0, 0, 0, 1, 1, 1], degree=2))
            add(Edge.make_bspline(
                [(27.086353151, 15.7216808439), (29.9419330776, 15.7216808439), (31.3560162572, 13.8073000611)],
                knots=[0, 0, 0, 1, 1, 1], degree=2))
            add(Edge.make_bspline(
                [(31.3560162572, 13.8073000611), (32.7700994369, 11.8929192783), (32.7700994369, 7.7945909676)],
                knots=[0, 0, 0, 1, 1, 1], degree=2))
            add(Edge.make_bspline(
                [(32.7700994369, 7.7945909676), (32.7700994369, 1.2374337453), (29.0291520059, 0)],
                knots=[0, 0, 0, 0.8112850274, 0.8112850274, 0.8112850274], degree=2))
            Line((29.0291520059, 0), (45.649356842, 0))
        make_face()
    extrude(amount=F2_DEPTH)


solid = Compound([f1.part, f2.part])
